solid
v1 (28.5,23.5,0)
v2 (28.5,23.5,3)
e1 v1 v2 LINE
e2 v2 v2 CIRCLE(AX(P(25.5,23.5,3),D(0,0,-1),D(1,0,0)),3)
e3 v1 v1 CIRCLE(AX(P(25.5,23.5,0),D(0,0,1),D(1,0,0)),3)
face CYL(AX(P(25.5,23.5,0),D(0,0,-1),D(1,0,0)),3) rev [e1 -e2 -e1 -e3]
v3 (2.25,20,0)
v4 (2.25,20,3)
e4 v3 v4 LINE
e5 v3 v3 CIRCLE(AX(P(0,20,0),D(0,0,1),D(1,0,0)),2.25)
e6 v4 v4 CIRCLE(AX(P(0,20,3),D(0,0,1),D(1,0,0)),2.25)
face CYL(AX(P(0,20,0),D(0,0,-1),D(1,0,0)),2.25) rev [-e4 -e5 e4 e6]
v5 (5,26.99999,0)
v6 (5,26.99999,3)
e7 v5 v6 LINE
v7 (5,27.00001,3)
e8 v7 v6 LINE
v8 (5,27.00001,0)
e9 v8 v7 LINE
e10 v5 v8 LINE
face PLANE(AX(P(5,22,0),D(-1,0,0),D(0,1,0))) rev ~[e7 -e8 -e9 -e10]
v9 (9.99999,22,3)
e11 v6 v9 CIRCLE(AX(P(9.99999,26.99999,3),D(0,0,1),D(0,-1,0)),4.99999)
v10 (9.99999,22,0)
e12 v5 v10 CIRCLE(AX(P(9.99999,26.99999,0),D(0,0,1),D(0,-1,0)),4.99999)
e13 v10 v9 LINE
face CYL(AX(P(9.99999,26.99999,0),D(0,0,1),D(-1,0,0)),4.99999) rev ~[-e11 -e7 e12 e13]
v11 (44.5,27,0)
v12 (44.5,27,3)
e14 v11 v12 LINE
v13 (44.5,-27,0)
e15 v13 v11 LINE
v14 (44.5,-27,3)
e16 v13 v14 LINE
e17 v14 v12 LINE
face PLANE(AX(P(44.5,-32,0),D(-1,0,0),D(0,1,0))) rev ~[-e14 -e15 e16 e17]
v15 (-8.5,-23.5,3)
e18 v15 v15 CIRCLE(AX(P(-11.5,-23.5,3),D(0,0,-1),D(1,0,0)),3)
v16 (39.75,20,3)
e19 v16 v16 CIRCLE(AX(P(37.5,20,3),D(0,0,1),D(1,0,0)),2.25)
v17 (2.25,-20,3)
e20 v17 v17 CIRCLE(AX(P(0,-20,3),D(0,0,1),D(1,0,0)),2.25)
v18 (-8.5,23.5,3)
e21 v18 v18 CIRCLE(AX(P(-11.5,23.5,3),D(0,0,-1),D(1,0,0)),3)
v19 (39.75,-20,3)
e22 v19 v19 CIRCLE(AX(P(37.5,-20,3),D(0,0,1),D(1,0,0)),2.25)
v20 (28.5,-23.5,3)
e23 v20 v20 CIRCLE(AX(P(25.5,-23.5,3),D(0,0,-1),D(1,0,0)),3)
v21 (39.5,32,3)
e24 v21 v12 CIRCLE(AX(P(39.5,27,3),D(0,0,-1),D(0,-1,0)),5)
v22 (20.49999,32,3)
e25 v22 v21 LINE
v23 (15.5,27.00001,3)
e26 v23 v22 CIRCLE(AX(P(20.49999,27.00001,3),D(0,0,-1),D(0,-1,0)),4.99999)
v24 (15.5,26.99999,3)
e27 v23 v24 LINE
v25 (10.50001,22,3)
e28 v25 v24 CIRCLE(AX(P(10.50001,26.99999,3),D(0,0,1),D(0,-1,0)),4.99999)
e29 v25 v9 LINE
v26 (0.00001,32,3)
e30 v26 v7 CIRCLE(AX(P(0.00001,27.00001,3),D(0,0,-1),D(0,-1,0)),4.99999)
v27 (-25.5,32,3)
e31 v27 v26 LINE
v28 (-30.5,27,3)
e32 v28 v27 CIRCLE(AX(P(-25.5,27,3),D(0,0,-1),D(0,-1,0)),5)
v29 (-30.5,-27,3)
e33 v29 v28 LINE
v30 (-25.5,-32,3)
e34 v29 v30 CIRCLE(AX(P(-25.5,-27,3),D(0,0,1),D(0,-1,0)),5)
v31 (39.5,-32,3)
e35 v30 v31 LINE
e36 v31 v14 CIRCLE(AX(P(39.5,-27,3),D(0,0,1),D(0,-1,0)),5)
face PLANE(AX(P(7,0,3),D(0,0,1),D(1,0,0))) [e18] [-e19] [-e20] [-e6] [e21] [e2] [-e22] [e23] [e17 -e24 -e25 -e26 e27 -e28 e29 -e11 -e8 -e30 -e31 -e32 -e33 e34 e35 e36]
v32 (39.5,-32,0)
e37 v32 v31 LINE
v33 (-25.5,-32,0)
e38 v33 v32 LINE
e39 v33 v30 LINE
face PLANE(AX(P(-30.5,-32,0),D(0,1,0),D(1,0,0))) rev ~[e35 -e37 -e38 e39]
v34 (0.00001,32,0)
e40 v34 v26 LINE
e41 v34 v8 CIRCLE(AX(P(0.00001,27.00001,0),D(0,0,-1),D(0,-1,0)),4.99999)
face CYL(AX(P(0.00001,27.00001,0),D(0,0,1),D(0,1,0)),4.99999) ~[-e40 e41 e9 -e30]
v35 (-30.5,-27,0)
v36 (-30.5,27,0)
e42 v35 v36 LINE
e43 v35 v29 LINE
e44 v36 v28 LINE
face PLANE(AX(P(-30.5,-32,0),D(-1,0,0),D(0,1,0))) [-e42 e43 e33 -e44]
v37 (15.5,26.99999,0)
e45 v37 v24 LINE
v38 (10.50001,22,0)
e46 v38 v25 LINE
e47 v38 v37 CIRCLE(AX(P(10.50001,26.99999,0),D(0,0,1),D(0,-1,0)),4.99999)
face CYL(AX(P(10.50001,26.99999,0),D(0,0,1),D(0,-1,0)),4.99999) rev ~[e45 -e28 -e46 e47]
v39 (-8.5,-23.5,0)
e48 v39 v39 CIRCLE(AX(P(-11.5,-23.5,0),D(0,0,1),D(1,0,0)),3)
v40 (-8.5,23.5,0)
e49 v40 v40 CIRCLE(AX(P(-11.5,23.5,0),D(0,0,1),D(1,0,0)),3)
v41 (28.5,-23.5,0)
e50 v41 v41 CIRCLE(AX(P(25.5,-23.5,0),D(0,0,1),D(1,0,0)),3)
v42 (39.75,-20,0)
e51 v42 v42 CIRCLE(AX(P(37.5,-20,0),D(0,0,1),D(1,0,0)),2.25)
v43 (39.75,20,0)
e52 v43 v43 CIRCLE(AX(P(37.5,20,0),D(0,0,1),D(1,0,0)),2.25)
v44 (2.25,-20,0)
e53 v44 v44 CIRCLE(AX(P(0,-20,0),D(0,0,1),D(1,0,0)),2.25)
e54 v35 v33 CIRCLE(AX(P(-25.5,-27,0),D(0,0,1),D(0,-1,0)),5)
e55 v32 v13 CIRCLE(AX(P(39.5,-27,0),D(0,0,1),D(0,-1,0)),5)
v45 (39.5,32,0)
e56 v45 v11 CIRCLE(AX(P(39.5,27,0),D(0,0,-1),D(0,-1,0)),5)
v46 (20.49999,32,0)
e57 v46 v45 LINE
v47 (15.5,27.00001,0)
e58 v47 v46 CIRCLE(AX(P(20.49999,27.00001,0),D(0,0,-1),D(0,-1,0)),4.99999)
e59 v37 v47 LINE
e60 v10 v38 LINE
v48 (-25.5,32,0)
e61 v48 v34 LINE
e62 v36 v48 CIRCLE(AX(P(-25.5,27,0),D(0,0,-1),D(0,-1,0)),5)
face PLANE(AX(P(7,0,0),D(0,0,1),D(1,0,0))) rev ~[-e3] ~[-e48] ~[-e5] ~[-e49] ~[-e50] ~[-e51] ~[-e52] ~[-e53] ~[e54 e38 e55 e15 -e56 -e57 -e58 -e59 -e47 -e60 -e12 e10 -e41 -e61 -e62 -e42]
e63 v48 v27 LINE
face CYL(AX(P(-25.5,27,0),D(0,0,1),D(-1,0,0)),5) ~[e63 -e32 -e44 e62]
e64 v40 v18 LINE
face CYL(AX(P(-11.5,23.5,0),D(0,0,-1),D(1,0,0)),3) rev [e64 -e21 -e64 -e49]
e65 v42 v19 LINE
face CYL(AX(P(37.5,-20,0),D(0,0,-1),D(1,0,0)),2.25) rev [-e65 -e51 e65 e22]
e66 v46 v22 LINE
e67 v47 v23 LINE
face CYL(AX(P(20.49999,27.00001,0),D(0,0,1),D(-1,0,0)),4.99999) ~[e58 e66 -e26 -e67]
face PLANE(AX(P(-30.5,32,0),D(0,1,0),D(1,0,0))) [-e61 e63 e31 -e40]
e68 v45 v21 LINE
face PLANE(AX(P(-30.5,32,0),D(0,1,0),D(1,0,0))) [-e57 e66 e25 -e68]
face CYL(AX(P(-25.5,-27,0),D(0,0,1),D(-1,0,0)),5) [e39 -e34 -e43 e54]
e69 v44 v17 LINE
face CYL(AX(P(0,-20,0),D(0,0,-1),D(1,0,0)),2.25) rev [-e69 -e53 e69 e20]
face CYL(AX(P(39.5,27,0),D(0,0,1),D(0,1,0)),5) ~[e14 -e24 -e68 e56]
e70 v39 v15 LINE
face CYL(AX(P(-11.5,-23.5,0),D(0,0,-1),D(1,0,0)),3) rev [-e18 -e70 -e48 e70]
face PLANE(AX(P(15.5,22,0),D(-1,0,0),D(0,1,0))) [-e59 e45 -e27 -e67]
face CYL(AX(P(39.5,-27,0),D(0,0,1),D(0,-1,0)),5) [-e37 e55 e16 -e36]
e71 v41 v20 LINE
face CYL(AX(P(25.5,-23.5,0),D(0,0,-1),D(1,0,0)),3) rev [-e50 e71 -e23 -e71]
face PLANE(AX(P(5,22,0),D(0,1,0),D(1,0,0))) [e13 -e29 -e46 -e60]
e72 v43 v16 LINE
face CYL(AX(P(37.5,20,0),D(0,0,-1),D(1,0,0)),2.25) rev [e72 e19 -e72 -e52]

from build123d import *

# Parameters (mm, degrees)
F1_W     = 75
F1_H     = 64
F1_R     = 2.25
F2_DEPTH = 3
F3_R     = 5
F4_R     = 3
F5_DEPTH = 25
F6_W     = 10.5
F6_H     = 12.9868694071
F7_DEPTH = 25
F8_R     = 4.99999


# Not quite as in the source:
# - a fillet or chamfer is up to 0.001 mm smaller than in the source, because OpenCascade refuses the exact size


with BuildPart() as f2:
    # F1 (on Top) → F2 (new body)
    with BuildSketch(Plane.XY):
        with Locations((7, 0)):
            Rectangle(F1_W, F1_H)
        with Locations((0, -20)):
            Circle(F1_R, mode=Mode.SUBTRACT)
        with Locations((37.5, -20)):
            Circle(F1_R, mode=Mode.SUBTRACT)
        with Locations((0, 20)):
            Circle(F1_R, mode=Mode.SUBTRACT)
        with Locations((37.5, 20)):
            Circle(F1_R, mode=Mode.SUBTRACT)
    extrude(amount=F2_DEPTH)

    # F3
    f3_edges = [f2.edges().sort_by_distance(p)[0] for p in [
        (-30.5, 32, 1.5),
        (-30.5, -32, 1.5),
        (44.5, -32, 1.5),
        (44.5, 32, 1.5),
    ]]
    fillet(f3_edges, radius=F3_R)

    # F4 (on Top) → F5 (cut)
    with BuildSketch(Plane.XY):
        with Locations((25.5, 23.5)):
            Circle(F4_R)
        with Locations((-11.5, 23.5)):
            Circle(F4_R)
        with Locations((25.5, -23.5)):
            Circle(F4_R)
        with Locations((-11.5, -23.5)):
            Circle(F4_R)
    extrude(amount=F5_DEPTH, mode=Mode.SUBTRACT)

    # F6 (on Top) → F7 (cut)
    with BuildSketch(Plane.XY):
        with Locations((10.25, 28.4934347035)):
            Rectangle(F6_W, F6_H)
    extrude(amount=F7_DEPTH, mode=Mode.SUBTRACT)

    # F8 (radius 5 in the source; OpenCascade refuses exactly that, so slightly less here)
    f8_edges = [f2.edges().sort_by_distance(p)[0] for p in [
        (5, 32, 1.5),
        (5, 22, 1.5),
        (15.5, 32, 1.5),
        (15.5, 22, 1.5),
    ]]
    fillet(f8_edges, radius=F8_R)


solid = f2.part
